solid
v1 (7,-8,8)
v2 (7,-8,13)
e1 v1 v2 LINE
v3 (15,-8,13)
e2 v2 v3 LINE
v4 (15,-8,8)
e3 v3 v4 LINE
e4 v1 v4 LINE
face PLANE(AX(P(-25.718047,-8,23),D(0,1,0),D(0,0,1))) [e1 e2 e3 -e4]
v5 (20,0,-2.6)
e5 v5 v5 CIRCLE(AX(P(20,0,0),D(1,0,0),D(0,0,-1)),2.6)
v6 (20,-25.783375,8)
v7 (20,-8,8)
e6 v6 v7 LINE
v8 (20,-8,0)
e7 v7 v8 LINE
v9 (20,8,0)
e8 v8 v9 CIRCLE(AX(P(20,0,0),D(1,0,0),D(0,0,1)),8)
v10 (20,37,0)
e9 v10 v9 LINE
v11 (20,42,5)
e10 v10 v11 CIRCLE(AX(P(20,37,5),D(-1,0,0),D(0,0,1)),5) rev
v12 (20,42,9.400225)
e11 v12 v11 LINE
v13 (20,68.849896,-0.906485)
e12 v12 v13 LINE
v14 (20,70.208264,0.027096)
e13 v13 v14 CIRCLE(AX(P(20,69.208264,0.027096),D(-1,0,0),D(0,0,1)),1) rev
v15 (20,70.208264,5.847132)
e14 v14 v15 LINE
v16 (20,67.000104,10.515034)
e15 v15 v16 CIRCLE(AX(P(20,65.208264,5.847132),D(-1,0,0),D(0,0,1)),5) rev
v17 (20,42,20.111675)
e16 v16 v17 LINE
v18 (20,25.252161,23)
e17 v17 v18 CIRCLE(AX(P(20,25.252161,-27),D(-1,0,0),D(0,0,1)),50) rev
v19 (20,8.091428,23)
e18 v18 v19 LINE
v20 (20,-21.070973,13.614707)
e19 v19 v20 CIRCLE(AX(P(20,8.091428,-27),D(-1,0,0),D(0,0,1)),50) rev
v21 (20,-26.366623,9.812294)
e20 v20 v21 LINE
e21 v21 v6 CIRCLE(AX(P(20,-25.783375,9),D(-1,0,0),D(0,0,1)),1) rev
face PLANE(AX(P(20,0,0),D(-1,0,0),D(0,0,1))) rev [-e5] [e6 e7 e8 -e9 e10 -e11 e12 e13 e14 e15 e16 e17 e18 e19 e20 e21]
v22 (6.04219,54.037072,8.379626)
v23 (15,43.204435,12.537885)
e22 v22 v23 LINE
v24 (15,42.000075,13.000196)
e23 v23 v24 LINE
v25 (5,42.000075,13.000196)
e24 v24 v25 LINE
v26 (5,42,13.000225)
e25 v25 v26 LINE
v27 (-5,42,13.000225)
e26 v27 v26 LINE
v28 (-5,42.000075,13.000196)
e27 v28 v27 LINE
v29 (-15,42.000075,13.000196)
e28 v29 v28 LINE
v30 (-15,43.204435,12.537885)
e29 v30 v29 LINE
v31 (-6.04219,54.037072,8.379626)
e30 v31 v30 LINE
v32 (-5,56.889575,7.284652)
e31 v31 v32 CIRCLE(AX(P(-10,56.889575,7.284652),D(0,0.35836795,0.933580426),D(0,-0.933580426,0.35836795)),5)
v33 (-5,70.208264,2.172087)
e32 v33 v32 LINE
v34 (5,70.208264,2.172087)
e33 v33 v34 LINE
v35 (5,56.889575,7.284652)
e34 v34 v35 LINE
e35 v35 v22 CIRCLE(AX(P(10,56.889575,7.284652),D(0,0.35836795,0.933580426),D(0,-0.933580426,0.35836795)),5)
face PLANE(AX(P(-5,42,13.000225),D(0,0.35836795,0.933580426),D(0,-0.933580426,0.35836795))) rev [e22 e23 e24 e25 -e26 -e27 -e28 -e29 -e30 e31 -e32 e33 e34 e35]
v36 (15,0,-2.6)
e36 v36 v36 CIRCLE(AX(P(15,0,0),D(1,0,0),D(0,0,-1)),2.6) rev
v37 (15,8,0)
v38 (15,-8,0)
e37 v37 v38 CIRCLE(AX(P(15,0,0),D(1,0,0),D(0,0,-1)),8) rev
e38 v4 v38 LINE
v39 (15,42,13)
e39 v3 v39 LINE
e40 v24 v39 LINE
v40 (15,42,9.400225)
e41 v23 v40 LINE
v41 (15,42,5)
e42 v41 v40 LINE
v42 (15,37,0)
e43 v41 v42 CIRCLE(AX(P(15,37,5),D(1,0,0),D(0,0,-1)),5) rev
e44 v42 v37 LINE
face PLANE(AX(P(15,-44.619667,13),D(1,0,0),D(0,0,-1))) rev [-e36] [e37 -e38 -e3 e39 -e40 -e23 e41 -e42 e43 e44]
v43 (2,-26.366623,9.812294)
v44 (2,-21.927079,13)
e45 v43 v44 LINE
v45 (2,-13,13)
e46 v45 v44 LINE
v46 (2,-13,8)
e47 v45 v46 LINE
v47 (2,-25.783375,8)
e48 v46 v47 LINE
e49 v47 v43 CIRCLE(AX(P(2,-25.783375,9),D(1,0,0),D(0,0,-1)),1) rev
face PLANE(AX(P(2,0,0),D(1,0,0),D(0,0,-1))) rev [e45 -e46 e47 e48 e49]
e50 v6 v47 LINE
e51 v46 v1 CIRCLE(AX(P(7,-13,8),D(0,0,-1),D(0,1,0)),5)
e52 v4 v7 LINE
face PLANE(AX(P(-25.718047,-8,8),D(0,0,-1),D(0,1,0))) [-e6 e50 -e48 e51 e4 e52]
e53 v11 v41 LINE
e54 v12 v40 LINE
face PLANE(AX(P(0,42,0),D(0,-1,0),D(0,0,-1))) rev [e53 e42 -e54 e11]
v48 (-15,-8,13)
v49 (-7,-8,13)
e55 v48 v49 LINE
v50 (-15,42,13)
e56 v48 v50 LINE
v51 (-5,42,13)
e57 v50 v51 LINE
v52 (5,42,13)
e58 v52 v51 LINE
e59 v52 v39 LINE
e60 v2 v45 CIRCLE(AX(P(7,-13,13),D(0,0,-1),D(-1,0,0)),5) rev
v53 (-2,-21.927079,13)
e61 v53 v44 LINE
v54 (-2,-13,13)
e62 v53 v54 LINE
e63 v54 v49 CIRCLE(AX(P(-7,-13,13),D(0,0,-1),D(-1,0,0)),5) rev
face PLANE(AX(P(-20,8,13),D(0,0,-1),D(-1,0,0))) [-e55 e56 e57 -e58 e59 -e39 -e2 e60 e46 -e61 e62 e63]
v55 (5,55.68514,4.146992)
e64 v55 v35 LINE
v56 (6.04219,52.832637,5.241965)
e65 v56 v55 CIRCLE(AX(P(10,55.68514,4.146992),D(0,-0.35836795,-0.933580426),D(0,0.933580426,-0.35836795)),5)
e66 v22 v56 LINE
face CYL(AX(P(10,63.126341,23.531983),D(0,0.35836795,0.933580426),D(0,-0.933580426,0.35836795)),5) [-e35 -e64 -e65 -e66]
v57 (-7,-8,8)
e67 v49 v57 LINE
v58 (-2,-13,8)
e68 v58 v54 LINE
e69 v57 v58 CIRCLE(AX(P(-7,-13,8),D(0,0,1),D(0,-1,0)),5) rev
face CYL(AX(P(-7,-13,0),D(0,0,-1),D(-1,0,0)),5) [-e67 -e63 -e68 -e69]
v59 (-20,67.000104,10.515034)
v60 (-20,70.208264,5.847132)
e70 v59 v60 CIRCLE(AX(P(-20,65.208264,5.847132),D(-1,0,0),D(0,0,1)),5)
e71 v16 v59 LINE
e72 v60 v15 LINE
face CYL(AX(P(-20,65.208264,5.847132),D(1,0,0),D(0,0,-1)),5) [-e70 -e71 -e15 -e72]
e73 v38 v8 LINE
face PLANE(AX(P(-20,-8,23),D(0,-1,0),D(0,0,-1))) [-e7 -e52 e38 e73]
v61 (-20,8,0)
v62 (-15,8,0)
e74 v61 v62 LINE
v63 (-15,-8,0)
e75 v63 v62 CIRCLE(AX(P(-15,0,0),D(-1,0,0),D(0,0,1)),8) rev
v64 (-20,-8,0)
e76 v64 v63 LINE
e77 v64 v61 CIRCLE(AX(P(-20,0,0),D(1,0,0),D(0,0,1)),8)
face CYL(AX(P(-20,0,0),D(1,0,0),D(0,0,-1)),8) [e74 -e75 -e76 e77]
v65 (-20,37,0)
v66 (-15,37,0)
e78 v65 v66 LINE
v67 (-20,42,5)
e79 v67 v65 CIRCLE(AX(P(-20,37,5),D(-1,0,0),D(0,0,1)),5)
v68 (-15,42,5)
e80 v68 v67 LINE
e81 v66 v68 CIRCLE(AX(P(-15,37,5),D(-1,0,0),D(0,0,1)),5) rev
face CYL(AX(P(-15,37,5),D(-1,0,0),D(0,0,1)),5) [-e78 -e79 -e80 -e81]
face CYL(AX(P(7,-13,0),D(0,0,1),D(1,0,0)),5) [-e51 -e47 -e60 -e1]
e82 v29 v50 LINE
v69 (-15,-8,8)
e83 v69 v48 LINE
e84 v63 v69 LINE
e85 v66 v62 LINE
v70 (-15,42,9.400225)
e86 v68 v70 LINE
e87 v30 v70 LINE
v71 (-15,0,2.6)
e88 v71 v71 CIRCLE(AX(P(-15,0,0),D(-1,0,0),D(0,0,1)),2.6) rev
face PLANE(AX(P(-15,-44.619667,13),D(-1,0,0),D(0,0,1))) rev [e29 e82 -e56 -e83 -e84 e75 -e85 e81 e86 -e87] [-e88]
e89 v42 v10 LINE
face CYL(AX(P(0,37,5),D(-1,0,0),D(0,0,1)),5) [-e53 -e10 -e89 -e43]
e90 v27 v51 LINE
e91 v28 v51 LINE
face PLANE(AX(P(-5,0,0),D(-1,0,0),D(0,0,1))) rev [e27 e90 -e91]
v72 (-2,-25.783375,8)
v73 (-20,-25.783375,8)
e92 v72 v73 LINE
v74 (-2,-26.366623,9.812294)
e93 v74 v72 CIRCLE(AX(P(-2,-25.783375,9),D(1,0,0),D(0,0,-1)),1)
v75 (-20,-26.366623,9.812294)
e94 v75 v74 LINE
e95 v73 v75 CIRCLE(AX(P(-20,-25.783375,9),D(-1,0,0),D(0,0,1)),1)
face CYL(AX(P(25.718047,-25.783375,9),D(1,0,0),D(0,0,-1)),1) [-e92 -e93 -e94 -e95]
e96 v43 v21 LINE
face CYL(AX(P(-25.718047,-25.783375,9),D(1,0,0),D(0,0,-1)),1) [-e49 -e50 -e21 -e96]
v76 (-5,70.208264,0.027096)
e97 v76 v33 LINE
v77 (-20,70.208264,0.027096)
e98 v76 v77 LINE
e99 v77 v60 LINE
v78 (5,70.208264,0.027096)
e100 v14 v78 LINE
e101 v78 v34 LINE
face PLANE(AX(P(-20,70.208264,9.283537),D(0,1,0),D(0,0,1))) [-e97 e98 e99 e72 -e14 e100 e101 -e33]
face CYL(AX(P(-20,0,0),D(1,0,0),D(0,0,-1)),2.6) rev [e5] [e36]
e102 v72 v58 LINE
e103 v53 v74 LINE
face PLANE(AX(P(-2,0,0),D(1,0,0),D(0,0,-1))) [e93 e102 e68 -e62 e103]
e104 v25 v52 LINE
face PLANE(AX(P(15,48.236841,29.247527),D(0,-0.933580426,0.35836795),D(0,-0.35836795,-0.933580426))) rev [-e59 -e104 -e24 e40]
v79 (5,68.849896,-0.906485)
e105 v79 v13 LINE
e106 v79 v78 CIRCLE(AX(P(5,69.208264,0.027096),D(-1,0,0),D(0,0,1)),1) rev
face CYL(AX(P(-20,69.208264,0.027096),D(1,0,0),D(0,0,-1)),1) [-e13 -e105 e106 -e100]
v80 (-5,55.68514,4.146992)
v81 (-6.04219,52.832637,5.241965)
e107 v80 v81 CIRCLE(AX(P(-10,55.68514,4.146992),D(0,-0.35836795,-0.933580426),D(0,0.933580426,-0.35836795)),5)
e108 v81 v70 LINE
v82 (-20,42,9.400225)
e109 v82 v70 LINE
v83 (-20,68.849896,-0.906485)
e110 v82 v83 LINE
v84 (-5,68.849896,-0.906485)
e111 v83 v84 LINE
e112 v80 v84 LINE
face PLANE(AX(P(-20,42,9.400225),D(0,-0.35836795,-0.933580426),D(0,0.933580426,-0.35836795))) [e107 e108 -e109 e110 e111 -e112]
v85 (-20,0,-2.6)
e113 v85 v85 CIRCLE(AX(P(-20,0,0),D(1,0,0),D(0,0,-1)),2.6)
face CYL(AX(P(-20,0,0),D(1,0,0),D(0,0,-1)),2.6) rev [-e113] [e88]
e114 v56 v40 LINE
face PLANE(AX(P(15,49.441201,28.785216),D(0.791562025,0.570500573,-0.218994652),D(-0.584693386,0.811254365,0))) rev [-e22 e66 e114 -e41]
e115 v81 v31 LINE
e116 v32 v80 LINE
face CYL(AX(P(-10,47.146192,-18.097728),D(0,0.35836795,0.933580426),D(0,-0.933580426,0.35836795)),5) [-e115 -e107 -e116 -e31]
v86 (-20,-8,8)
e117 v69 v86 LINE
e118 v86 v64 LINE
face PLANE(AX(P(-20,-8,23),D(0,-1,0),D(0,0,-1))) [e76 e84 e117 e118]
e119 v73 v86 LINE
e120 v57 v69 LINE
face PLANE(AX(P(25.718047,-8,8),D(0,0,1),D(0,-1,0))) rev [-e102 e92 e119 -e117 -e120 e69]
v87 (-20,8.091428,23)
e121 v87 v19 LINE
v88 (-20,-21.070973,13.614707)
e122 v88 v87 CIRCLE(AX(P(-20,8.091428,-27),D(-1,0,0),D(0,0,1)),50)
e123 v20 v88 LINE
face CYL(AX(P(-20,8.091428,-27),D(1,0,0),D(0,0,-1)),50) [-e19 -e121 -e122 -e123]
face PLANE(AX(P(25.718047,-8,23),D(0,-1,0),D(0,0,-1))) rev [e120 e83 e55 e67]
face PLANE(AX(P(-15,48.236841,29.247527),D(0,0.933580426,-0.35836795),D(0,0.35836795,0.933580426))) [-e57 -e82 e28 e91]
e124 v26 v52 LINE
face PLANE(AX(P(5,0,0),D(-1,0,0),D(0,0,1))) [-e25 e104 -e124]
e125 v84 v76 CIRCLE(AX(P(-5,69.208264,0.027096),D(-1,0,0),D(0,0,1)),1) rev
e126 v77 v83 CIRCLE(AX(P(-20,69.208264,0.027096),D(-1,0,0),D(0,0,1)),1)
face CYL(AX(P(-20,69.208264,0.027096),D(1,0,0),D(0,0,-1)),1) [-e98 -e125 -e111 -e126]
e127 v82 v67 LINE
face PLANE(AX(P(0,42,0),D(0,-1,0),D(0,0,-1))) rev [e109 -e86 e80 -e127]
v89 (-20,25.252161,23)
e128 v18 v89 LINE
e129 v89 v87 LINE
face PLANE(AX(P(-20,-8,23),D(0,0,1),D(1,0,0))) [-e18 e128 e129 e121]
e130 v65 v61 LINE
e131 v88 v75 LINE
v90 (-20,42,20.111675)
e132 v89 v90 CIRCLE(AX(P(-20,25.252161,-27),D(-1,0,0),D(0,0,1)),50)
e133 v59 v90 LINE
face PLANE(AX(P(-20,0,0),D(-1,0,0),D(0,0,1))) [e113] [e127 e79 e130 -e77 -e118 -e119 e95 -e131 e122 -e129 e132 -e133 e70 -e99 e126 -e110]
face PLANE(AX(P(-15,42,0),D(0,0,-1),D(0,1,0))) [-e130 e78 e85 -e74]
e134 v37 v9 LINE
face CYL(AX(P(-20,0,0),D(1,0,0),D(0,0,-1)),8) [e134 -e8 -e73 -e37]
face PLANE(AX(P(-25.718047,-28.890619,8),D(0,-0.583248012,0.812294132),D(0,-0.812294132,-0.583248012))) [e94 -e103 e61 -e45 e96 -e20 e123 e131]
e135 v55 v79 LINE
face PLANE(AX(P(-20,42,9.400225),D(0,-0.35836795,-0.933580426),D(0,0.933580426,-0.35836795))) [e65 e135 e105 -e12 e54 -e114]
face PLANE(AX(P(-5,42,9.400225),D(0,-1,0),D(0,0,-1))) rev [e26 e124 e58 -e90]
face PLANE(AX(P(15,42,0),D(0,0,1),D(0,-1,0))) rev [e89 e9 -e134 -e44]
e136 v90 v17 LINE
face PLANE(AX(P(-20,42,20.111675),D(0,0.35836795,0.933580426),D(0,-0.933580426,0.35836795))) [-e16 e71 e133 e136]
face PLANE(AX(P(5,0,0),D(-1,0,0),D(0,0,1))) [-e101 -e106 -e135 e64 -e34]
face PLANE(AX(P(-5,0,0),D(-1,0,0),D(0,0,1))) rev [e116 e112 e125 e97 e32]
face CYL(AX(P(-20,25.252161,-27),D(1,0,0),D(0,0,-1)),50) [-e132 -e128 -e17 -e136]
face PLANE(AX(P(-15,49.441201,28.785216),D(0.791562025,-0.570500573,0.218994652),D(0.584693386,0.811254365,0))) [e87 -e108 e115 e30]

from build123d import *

# Parameters (mm, degrees)
BOSS_EXTRUDE5_DEPTH      = 20
BOSS_EXTRUDE5_DEPTH_BACK = 20
SKETCH6_R                = 2.6000000000000005
SKETCH7_W                = 30.000000000000004
SKETCH7_H                = 21
CUT_EXTRUDE1_DEPTH       = 16
BOSS_EXTRUDE6_DEPTH      = 18
BOSS_EXTRUDE7_DEPTH      = 4
SKETCH12_W               = 4.9999999999999964
SKETCH12_H               = 12.999999999999998
BOSS_EXTRUDE8_DEPTH      = 34
FILLET4_R                = 5
FILLET5_R                = 1
CUT_EXTRUDE3_START       = -15
CUT_EXTRUDE3_DEPTH       = 10
CUT_EXTRUDE4_DEPTH       = 3.360889535
FILLET7_R                = 5
FILLET8_R                = 50


with BuildPart() as part:
    # Sketch6 → Boss-Extrude5 (new, two sides: drawn at the far end of the back side and taken through both)
    with BuildSketch(Plane(origin=(0, 0, 0), x_dir=(0, 0, -1), z_dir=(1, 0, 0)).offset(-BOSS_EXTRUDE5_DEPTH_BACK)):
        with BuildLine():
            Line((-23, -8), (0, -8))
            ThreePointArc((0, -8), (8, 0), (0, 8))
            Line((0, 8), (-13, 7.999999999999998))
            Line((-13, 7.999999999999998), (-13, 42))
            Line((-13, 42), (-9.400224659785392, 42))
            Line((-9.400224659785392, 42), (1.4279133192728315, 70.2082638402405))
            Line((1.4279133192728315, 70.2082638402405), (-9.283536617097441, 70.2082638402405))
            Line((-9.283536617097441, 70.2082638402405), (-20.111674596155662, 42))
            Line((-20.111674596155662, 42), (-23, 42))
            Line((-23, 42), (-23, -8))
        make_face()
        Circle(SKETCH6_R, mode=Mode.SUBTRACT)
    extrude(amount=BOSS_EXTRUDE5_DEPTH + BOSS_EXTRUDE5_DEPTH_BACK)

    # Sketch7 → Cut-Extrude1 (cut)
    with BuildSketch(Plane(origin=(0, 8, 1.07e-15), x_dir=(1, 0, 0), z_dir=(0, 1, 0))):
        with Locations((0, -2.4999999999999982)):
            Rectangle(SKETCH7_W, SKETCH7_H)
    extrude(amount=-CUT_EXTRUDE1_DEPTH, mode=Mode.SUBTRACT)

    # Sketch9 → Boss-Extrude6 (add)
    with BuildSketch(Plane(origin=(20, 0, 0), x_dir=(0, 0, -1), z_dir=(1, 0, 0))):
        Polygon((-8, -8), (-7.9999999999999964, -28.890618944469697), (-23, -8), align=None)
    boss_extrude6 = extrude(amount=-BOSS_EXTRUDE6_DEPTH)

    # Mirror1: Boss-Extrude6 across plane
    add(boss_extrude6.mirror(Plane(origin=(0, 0, 0), x_dir=(0, 0, 1), z_dir=(1, 0, 0))))

    # Sketch10 → Boss-Extrude7 (add)
    with BuildSketch(Plane.ZY.offset(-2)):
        Polygon((23, -8), (13, -8), (13.000000000000004, -21.927079296313124), align=None)
    extrude(amount=BOSS_EXTRUDE7_DEPTH)

    # Sketch12 → Boss-Extrude8 (add)
    with BuildSketch(Plane(origin=(0, 8, 1.07e-15), x_dir=(1, 0, 0), z_dir=(0, 1, 1.3e-16))):
        with Locations((17.5, -6.499999999999999)):
            Rectangle(SKETCH12_W, SKETCH12_H)
    boss_extrude8 = extrude(amount=BOSS_EXTRUDE8_DEPTH)

    # Mirror2: Boss-Extrude8 across plane
    add(boss_extrude8.mirror(Plane(origin=(0, 0, 0), x_dir=(0, 0, 1), z_dir=(1, 0, 0))))

    # Fillet4
    fillet4_edges = [part.edges().sort_by_distance(p)[0] for p in [
        (2, -8, 10.5),
        (-2, -8, 10.5),
    ]]
    fillet(fillet4_edges, radius=FILLET4_R)

    # Fillet5
    fillet5_edges = [part.edges().sort_by_distance(p)[0] for p in [
        (0, 70.2082638402405, -1.4279133192728315),
        (11, -28.890618944469697, 7.9999999999999964),
        (-11, -28.890618944469697, 7.9999999999999964),
    ]]
    fillet(fillet5_edges, radius=FILLET5_R)

    # Sketch13 → Cut-Extrude3 (cut)
    with BuildSketch(Plane(origin=(20, 0, 0), x_dir=(0, 0, -1), z_dir=(1, 0, 0)).offset(CUT_EXTRUDE3_START)):
        Polygon((1.4279133192728315, 70.2082638402405), (-9.400224659785392, 42), (-13.00022465978539, 42), (-2.172086680727171, 70.2082638402405), align=None)
    extrude(amount=-CUT_EXTRUDE3_DEPTH, mode=Mode.SUBTRACT)

    # Sketch14 → Cut-Extrude4 (cut)
    with BuildSketch(Plane(origin=(0, 8.538947678230453, 22.2447192205509), x_dir=(-1, 0, 0), z_dir=(0, -0.3583679495452972, -0.9335804264972031))):
        Polygon((-15.000000000000004, 35.8416386762901), (-5.000000000000001, 48.794944027775955), (-5.000000000000001, 35.8416386762901), (-5.000000000000001, 34.55159456879367), (-15.000000000000004, 34.55159456879367), align=None)
    cut_extrude4 = extrude(amount=-CUT_EXTRUDE4_DEPTH, mode=Mode.SUBTRACT)

    # Mirror3: Cut-Extrude4 across plane
    add(cut_extrude4.mirror(Plane(origin=(0, 0, 0), x_dir=(0, 0, 1), z_dir=(1, 0, 0))), mode=Mode.SUBTRACT)

    # Fillet7
    fillet7_edges = [part.edges().sort_by_distance(p)[0] for p in [
        (17.5, 42, 5.6e-15),
        (-17.5, 42, 5.6e-15),
        (0, 70.2082638402405, 9.283536617097441),
        (5.000000000000001, 54.695169880241785, 6.3270055238869265),
        (-5.000000000000001, 54.695169880241785, 6.3270055238869265),
    ]]
    fillet(fillet7_edges, radius=FILLET7_R)

    # Fillet8
    # the kernel refuses this fillet: 50 mm, written as the material it takes off along each edge
    with BuildSketch(Plane(origin=(61.869597916190855, 42, 23), x_dir=(0, 0, -1), z_dir=(-1, 0, 0))) as fillet8_piece_1:
        with BuildLine():
            CenterArc((50, 16.747839166469827), FILLET8_R, 180, 19.569909983271373)
            Line((0, 16.747839166469827), (-1, 16.747839166469827))
            Line((-1, 16.747839166469827), (-1, 0))
            Line((-1, 0), (0, -1))
            ThreePointArc((0, -1), (1.444162701922167, -1), (1.946091911921222, -0.33495678332939605))
            Line((1.946091911921222, -0.33495678332939605), (2.888325403844334, 0))
        make_face()
    extrude(amount=123.73919583238171, mode=Mode.SUBTRACT)
    with BuildSketch(Plane(origin=(-60.228570108654466, -8.000000000000004, 23), x_dir=(0, -0.812294131590468, -0.5832480122415225), z_dir=(1, 0, 0))) as fillet8_piece_2:
        with BuildLine():
            CenterArc((FILLET8_R * 0.321828560869, FILLET8_R), FILLET8_R, 234.32068370191269, 35.67931629808726)
            Line((-FILLET8_R * 0.261419451372, FILLET8_R * 0.18770586841), (-FILLET8_R * 0.273084411617, FILLET8_R * 0.171459985778))
            Line((-FILLET8_R * 0.273084411617, FILLET8_R * 0.171459985778), (-FILLET8_R * 0.00643657121738, -FILLET8_R * 0.02))
            Line((-FILLET8_R * 0.00643657121738, -FILLET8_R * 0.02), (FILLET8_R * 0.321828560869, -FILLET8_R * 0.02))
            Line((FILLET8_R * 0.321828560869, -FILLET8_R * 0.02), (FILLET8_R * 0.321828560869, 5e-16))
        make_face()
    extrude(amount=120.45714021730896, mode=Mode.SUBTRACT)


solid = part.part
